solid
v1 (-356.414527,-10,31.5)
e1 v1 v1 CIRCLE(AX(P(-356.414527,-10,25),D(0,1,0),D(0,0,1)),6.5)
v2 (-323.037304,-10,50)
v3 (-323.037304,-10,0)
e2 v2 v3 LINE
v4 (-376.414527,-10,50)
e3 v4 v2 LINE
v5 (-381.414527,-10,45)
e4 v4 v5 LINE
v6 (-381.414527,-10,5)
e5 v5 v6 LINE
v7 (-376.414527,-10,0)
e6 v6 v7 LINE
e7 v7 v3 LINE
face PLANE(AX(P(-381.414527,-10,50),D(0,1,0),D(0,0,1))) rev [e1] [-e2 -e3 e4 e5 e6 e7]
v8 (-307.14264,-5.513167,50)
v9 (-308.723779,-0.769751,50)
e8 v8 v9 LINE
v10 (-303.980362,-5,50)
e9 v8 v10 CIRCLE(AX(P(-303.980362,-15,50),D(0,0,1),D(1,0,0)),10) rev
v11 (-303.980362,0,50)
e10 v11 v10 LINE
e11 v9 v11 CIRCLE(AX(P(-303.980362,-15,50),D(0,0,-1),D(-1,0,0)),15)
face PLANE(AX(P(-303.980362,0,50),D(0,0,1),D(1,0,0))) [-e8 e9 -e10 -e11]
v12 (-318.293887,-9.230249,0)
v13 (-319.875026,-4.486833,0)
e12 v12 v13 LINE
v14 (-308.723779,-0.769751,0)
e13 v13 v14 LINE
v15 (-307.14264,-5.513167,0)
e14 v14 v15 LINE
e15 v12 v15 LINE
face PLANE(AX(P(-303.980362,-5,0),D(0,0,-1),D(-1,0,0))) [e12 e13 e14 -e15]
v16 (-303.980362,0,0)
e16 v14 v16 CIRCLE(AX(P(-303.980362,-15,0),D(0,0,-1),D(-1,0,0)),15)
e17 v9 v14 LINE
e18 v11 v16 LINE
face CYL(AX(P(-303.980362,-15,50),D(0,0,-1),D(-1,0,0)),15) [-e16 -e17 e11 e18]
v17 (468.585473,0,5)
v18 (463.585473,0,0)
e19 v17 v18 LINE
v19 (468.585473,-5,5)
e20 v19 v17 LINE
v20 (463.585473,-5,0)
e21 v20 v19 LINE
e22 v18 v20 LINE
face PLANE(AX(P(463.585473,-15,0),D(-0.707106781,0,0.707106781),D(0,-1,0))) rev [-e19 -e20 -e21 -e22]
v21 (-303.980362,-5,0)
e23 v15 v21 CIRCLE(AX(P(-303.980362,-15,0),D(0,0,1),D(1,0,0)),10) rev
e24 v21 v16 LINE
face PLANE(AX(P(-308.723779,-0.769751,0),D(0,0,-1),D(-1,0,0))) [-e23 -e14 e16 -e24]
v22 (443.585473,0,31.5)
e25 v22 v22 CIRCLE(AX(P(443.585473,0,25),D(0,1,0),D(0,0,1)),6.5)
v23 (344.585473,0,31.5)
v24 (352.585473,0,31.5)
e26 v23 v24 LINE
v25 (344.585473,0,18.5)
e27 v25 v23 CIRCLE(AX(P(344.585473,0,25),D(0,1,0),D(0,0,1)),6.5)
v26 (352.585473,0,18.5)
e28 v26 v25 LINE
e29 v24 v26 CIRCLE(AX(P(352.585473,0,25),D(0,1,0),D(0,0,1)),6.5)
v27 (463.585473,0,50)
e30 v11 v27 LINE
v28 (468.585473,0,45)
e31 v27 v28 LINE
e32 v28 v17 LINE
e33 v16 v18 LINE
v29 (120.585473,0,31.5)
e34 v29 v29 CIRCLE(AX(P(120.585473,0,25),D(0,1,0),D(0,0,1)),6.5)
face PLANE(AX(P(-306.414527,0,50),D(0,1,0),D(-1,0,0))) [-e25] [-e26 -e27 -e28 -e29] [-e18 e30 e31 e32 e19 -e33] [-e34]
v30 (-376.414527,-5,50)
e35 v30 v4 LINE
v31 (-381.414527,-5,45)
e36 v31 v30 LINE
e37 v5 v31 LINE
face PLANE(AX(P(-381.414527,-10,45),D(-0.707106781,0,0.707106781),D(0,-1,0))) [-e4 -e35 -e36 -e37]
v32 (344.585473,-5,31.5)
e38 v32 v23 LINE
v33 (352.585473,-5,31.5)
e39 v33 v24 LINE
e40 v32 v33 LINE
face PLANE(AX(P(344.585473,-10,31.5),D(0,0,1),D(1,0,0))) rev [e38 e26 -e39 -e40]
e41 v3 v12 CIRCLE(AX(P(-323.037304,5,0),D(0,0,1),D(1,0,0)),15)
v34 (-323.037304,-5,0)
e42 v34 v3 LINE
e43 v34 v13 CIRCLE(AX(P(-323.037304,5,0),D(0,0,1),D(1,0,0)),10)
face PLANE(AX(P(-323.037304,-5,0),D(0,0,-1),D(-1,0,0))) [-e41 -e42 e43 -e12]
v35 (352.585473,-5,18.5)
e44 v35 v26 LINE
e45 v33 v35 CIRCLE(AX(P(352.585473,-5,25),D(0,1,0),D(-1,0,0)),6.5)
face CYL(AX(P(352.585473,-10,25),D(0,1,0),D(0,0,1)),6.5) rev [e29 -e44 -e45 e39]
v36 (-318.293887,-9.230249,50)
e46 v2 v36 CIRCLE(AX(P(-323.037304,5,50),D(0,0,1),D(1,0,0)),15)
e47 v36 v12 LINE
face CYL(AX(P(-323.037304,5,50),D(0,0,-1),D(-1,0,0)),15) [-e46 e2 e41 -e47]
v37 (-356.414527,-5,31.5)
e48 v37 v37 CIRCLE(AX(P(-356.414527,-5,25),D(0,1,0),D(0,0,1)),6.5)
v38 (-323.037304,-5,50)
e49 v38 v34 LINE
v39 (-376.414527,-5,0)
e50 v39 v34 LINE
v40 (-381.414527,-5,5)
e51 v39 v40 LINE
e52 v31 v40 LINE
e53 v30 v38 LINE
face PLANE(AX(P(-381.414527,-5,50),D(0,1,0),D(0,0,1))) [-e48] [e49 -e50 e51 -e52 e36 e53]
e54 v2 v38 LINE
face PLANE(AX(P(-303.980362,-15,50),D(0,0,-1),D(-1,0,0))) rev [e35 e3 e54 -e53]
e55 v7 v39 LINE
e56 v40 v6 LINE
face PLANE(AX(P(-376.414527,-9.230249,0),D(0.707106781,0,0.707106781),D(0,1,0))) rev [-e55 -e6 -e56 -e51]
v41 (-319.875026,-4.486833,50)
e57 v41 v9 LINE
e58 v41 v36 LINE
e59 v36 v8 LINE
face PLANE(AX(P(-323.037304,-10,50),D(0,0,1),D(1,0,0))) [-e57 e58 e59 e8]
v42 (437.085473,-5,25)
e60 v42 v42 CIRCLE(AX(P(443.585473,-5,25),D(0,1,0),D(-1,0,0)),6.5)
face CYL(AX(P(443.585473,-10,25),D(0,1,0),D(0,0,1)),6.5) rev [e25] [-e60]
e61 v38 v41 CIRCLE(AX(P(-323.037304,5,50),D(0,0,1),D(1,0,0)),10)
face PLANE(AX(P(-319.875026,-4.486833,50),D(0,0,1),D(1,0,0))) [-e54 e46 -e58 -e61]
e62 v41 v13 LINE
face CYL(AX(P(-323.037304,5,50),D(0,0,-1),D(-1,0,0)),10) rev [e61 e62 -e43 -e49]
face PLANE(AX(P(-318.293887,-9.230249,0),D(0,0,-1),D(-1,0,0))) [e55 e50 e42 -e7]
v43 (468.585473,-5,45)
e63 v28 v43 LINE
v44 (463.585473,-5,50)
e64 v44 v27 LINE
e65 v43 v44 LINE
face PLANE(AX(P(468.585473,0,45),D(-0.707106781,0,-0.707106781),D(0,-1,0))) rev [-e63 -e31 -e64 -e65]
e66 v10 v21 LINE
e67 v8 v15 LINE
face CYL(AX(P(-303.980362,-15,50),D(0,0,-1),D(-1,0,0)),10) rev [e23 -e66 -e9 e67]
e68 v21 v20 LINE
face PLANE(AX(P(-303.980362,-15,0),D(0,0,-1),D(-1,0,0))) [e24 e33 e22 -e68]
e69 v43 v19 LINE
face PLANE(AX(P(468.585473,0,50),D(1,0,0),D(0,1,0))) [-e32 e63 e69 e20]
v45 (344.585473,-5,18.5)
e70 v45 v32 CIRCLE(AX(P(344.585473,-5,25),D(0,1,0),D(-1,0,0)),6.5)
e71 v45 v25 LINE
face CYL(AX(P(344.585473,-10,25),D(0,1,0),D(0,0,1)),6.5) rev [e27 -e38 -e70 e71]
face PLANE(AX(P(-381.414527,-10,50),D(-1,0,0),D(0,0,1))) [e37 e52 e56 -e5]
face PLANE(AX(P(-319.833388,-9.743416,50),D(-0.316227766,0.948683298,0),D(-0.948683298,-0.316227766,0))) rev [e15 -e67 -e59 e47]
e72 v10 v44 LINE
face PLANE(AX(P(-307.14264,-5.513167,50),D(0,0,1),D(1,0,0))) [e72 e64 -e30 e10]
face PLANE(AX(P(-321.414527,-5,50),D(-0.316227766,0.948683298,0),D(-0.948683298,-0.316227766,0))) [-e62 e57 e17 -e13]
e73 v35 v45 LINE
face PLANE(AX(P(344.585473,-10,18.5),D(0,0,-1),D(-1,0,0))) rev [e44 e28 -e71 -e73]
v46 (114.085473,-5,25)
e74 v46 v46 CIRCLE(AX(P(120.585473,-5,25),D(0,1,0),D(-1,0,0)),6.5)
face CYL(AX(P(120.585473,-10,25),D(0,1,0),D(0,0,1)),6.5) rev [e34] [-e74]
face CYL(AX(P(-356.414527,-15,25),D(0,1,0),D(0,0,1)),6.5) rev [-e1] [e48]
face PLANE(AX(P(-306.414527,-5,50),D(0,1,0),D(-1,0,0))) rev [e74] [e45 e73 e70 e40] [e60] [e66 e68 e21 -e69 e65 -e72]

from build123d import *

# Parameters (mm, degrees)
SM_BASE_FLANGE_1_DEPTH = 50
SKETCH_2_R             = 6.5
CUT_EXTRUDE_1_DEPTH    = 10
CUT_EXTRUDE_2_DEPTH    = 10
SKETCH_4_R             = 6.5
CUT_EXTRUDE_3_DEPTH    = 10
SKETCH_5_R             = 6.5
CUT_EXTRUDE_4_DEPTH    = 10
OTHER_START            = -10
OTHER_1_DEPTH          = 10


# Read off the part's stored shape, not the designer's step: Затупленный угол1
# Sheet-metal steps are written as plain solids
with BuildPart() as part:
    # Sketch 1 → Базовая кромка1 (new body)
    with BuildSketch(Plane.XY):
        with BuildLine():
            Line((-381.414527052, -5), (-323.037303653, -5))
            ThreePointArc((-323.037303653, -5), (-321.435481223, -4.870874576), (-319.875025993, -4.486832981))
            Line((-319.875025993, -4.486832981), (-308.723778639, -0.769750529))
            ThreePointArc((-308.723778639, -0.769750529), (-306.383095794, -0.193688135), (-303.980362149, 0))
            Line((-303.980362149, 0), (468.585472948, 0))
            Line((468.585472948, 0), (468.585472948, -5))
            Line((468.585472948, -5), (-303.980362149, -5))
            ThreePointArc((-303.980362149, -5), (-305.582184579, -5.129125424), (-307.142639809, -5.513167019))
            Line((-307.142639809, -5.513167019), (-318.293887163, -9.230249471))
            ThreePointArc((-318.293887163, -9.230249471), (-320.634570008, -9.806311865), (-323.037303653, -10))
            Line((-323.037303653, -10), (-381.414527052, -10))
            Line((-381.414527052, -10), (-381.414527052, -5))
        make_face()
    extrude(amount=SM_BASE_FLANGE_1_DEPTH)

    # Sketch 2 → Вырез-Вытянуть1 (cut)
    with BuildSketch(Plane(origin=(0, 0, 0), x_dir=(1, 0, 0), z_dir=(0, 1, 0))):
        with Locations(Location((443.585472948, -25, 0), (0, 0, 270))):
            Circle(SKETCH_2_R)
    extrude(amount=-CUT_EXTRUDE_1_DEPTH, mode=Mode.SUBTRACT)

    # Эскиз3 → Вырез-Вытянуть2 (cut)
    with BuildSketch(Plane(origin=(0, 0, 0), x_dir=(1, 0, 0), z_dir=(0, 1, 0))):
        with BuildLine():
            Line((344.585472948, -18.5), (352.585472948, -18.5))
            ThreePointArc((352.585472948, -18.5), (359.085472948, -25), (352.585472948, -31.5))
            Line((352.585472948, -31.5), (344.585472948, -31.5))
            ThreePointArc((344.585472948, -31.5), (338.085472948, -25), (344.585472948, -18.5))
        make_face()
    extrude(amount=-CUT_EXTRUDE_2_DEPTH, mode=Mode.SUBTRACT)

    # Эскиз4 → Вырез-Вытянуть3 (cut)
    with BuildSketch(Plane(origin=(0, 0, 0), x_dir=(1, 0, 0), z_dir=(0, 1, 0))):
        with Locations(Location((120.585472948, -25, 0), (0, 0, 270))):
            Circle(SKETCH_4_R)
    extrude(amount=-CUT_EXTRUDE_3_DEPTH, mode=Mode.SUBTRACT)

    # Эскиз5 → Вырез-Вытянуть4 (cut)
    with BuildSketch(Plane(origin=(0, -5, 0), x_dir=(1, 0, 0), z_dir=(0, 1, 0))):
        with Locations(Location((-356.414527052, -25, 0), (0, 0, 270))):
            Circle(SKETCH_5_R)
    extrude(amount=-CUT_EXTRUDE_4_DEPTH, mode=Mode.SUBTRACT)

    # Other 1 outline → Other 1 (cut)
    with BuildSketch(Plane(origin=(0, 0, 0), x_dir=(1, 0, 0), z_dir=(0, 1, 0)).offset(OTHER_START)):
        Polygon((468.585472948, 0), (463.585472948, 0), (468.585472948, -5), align=None)
        Polygon((468.585472948, -50), (468.585472948, -45), (463.585472948, -50), align=None)
        Polygon((-381.414527052, 0), (-381.414527052, -5), (-376.414527052, 0), align=None)
        Polygon((-376.414527052, -50), (-381.414527052, -45), (-381.414527052, -50), align=None)
    extrude(amount=OTHER_1_DEPTH, mode=Mode.SUBTRACT)


solid = part.part
